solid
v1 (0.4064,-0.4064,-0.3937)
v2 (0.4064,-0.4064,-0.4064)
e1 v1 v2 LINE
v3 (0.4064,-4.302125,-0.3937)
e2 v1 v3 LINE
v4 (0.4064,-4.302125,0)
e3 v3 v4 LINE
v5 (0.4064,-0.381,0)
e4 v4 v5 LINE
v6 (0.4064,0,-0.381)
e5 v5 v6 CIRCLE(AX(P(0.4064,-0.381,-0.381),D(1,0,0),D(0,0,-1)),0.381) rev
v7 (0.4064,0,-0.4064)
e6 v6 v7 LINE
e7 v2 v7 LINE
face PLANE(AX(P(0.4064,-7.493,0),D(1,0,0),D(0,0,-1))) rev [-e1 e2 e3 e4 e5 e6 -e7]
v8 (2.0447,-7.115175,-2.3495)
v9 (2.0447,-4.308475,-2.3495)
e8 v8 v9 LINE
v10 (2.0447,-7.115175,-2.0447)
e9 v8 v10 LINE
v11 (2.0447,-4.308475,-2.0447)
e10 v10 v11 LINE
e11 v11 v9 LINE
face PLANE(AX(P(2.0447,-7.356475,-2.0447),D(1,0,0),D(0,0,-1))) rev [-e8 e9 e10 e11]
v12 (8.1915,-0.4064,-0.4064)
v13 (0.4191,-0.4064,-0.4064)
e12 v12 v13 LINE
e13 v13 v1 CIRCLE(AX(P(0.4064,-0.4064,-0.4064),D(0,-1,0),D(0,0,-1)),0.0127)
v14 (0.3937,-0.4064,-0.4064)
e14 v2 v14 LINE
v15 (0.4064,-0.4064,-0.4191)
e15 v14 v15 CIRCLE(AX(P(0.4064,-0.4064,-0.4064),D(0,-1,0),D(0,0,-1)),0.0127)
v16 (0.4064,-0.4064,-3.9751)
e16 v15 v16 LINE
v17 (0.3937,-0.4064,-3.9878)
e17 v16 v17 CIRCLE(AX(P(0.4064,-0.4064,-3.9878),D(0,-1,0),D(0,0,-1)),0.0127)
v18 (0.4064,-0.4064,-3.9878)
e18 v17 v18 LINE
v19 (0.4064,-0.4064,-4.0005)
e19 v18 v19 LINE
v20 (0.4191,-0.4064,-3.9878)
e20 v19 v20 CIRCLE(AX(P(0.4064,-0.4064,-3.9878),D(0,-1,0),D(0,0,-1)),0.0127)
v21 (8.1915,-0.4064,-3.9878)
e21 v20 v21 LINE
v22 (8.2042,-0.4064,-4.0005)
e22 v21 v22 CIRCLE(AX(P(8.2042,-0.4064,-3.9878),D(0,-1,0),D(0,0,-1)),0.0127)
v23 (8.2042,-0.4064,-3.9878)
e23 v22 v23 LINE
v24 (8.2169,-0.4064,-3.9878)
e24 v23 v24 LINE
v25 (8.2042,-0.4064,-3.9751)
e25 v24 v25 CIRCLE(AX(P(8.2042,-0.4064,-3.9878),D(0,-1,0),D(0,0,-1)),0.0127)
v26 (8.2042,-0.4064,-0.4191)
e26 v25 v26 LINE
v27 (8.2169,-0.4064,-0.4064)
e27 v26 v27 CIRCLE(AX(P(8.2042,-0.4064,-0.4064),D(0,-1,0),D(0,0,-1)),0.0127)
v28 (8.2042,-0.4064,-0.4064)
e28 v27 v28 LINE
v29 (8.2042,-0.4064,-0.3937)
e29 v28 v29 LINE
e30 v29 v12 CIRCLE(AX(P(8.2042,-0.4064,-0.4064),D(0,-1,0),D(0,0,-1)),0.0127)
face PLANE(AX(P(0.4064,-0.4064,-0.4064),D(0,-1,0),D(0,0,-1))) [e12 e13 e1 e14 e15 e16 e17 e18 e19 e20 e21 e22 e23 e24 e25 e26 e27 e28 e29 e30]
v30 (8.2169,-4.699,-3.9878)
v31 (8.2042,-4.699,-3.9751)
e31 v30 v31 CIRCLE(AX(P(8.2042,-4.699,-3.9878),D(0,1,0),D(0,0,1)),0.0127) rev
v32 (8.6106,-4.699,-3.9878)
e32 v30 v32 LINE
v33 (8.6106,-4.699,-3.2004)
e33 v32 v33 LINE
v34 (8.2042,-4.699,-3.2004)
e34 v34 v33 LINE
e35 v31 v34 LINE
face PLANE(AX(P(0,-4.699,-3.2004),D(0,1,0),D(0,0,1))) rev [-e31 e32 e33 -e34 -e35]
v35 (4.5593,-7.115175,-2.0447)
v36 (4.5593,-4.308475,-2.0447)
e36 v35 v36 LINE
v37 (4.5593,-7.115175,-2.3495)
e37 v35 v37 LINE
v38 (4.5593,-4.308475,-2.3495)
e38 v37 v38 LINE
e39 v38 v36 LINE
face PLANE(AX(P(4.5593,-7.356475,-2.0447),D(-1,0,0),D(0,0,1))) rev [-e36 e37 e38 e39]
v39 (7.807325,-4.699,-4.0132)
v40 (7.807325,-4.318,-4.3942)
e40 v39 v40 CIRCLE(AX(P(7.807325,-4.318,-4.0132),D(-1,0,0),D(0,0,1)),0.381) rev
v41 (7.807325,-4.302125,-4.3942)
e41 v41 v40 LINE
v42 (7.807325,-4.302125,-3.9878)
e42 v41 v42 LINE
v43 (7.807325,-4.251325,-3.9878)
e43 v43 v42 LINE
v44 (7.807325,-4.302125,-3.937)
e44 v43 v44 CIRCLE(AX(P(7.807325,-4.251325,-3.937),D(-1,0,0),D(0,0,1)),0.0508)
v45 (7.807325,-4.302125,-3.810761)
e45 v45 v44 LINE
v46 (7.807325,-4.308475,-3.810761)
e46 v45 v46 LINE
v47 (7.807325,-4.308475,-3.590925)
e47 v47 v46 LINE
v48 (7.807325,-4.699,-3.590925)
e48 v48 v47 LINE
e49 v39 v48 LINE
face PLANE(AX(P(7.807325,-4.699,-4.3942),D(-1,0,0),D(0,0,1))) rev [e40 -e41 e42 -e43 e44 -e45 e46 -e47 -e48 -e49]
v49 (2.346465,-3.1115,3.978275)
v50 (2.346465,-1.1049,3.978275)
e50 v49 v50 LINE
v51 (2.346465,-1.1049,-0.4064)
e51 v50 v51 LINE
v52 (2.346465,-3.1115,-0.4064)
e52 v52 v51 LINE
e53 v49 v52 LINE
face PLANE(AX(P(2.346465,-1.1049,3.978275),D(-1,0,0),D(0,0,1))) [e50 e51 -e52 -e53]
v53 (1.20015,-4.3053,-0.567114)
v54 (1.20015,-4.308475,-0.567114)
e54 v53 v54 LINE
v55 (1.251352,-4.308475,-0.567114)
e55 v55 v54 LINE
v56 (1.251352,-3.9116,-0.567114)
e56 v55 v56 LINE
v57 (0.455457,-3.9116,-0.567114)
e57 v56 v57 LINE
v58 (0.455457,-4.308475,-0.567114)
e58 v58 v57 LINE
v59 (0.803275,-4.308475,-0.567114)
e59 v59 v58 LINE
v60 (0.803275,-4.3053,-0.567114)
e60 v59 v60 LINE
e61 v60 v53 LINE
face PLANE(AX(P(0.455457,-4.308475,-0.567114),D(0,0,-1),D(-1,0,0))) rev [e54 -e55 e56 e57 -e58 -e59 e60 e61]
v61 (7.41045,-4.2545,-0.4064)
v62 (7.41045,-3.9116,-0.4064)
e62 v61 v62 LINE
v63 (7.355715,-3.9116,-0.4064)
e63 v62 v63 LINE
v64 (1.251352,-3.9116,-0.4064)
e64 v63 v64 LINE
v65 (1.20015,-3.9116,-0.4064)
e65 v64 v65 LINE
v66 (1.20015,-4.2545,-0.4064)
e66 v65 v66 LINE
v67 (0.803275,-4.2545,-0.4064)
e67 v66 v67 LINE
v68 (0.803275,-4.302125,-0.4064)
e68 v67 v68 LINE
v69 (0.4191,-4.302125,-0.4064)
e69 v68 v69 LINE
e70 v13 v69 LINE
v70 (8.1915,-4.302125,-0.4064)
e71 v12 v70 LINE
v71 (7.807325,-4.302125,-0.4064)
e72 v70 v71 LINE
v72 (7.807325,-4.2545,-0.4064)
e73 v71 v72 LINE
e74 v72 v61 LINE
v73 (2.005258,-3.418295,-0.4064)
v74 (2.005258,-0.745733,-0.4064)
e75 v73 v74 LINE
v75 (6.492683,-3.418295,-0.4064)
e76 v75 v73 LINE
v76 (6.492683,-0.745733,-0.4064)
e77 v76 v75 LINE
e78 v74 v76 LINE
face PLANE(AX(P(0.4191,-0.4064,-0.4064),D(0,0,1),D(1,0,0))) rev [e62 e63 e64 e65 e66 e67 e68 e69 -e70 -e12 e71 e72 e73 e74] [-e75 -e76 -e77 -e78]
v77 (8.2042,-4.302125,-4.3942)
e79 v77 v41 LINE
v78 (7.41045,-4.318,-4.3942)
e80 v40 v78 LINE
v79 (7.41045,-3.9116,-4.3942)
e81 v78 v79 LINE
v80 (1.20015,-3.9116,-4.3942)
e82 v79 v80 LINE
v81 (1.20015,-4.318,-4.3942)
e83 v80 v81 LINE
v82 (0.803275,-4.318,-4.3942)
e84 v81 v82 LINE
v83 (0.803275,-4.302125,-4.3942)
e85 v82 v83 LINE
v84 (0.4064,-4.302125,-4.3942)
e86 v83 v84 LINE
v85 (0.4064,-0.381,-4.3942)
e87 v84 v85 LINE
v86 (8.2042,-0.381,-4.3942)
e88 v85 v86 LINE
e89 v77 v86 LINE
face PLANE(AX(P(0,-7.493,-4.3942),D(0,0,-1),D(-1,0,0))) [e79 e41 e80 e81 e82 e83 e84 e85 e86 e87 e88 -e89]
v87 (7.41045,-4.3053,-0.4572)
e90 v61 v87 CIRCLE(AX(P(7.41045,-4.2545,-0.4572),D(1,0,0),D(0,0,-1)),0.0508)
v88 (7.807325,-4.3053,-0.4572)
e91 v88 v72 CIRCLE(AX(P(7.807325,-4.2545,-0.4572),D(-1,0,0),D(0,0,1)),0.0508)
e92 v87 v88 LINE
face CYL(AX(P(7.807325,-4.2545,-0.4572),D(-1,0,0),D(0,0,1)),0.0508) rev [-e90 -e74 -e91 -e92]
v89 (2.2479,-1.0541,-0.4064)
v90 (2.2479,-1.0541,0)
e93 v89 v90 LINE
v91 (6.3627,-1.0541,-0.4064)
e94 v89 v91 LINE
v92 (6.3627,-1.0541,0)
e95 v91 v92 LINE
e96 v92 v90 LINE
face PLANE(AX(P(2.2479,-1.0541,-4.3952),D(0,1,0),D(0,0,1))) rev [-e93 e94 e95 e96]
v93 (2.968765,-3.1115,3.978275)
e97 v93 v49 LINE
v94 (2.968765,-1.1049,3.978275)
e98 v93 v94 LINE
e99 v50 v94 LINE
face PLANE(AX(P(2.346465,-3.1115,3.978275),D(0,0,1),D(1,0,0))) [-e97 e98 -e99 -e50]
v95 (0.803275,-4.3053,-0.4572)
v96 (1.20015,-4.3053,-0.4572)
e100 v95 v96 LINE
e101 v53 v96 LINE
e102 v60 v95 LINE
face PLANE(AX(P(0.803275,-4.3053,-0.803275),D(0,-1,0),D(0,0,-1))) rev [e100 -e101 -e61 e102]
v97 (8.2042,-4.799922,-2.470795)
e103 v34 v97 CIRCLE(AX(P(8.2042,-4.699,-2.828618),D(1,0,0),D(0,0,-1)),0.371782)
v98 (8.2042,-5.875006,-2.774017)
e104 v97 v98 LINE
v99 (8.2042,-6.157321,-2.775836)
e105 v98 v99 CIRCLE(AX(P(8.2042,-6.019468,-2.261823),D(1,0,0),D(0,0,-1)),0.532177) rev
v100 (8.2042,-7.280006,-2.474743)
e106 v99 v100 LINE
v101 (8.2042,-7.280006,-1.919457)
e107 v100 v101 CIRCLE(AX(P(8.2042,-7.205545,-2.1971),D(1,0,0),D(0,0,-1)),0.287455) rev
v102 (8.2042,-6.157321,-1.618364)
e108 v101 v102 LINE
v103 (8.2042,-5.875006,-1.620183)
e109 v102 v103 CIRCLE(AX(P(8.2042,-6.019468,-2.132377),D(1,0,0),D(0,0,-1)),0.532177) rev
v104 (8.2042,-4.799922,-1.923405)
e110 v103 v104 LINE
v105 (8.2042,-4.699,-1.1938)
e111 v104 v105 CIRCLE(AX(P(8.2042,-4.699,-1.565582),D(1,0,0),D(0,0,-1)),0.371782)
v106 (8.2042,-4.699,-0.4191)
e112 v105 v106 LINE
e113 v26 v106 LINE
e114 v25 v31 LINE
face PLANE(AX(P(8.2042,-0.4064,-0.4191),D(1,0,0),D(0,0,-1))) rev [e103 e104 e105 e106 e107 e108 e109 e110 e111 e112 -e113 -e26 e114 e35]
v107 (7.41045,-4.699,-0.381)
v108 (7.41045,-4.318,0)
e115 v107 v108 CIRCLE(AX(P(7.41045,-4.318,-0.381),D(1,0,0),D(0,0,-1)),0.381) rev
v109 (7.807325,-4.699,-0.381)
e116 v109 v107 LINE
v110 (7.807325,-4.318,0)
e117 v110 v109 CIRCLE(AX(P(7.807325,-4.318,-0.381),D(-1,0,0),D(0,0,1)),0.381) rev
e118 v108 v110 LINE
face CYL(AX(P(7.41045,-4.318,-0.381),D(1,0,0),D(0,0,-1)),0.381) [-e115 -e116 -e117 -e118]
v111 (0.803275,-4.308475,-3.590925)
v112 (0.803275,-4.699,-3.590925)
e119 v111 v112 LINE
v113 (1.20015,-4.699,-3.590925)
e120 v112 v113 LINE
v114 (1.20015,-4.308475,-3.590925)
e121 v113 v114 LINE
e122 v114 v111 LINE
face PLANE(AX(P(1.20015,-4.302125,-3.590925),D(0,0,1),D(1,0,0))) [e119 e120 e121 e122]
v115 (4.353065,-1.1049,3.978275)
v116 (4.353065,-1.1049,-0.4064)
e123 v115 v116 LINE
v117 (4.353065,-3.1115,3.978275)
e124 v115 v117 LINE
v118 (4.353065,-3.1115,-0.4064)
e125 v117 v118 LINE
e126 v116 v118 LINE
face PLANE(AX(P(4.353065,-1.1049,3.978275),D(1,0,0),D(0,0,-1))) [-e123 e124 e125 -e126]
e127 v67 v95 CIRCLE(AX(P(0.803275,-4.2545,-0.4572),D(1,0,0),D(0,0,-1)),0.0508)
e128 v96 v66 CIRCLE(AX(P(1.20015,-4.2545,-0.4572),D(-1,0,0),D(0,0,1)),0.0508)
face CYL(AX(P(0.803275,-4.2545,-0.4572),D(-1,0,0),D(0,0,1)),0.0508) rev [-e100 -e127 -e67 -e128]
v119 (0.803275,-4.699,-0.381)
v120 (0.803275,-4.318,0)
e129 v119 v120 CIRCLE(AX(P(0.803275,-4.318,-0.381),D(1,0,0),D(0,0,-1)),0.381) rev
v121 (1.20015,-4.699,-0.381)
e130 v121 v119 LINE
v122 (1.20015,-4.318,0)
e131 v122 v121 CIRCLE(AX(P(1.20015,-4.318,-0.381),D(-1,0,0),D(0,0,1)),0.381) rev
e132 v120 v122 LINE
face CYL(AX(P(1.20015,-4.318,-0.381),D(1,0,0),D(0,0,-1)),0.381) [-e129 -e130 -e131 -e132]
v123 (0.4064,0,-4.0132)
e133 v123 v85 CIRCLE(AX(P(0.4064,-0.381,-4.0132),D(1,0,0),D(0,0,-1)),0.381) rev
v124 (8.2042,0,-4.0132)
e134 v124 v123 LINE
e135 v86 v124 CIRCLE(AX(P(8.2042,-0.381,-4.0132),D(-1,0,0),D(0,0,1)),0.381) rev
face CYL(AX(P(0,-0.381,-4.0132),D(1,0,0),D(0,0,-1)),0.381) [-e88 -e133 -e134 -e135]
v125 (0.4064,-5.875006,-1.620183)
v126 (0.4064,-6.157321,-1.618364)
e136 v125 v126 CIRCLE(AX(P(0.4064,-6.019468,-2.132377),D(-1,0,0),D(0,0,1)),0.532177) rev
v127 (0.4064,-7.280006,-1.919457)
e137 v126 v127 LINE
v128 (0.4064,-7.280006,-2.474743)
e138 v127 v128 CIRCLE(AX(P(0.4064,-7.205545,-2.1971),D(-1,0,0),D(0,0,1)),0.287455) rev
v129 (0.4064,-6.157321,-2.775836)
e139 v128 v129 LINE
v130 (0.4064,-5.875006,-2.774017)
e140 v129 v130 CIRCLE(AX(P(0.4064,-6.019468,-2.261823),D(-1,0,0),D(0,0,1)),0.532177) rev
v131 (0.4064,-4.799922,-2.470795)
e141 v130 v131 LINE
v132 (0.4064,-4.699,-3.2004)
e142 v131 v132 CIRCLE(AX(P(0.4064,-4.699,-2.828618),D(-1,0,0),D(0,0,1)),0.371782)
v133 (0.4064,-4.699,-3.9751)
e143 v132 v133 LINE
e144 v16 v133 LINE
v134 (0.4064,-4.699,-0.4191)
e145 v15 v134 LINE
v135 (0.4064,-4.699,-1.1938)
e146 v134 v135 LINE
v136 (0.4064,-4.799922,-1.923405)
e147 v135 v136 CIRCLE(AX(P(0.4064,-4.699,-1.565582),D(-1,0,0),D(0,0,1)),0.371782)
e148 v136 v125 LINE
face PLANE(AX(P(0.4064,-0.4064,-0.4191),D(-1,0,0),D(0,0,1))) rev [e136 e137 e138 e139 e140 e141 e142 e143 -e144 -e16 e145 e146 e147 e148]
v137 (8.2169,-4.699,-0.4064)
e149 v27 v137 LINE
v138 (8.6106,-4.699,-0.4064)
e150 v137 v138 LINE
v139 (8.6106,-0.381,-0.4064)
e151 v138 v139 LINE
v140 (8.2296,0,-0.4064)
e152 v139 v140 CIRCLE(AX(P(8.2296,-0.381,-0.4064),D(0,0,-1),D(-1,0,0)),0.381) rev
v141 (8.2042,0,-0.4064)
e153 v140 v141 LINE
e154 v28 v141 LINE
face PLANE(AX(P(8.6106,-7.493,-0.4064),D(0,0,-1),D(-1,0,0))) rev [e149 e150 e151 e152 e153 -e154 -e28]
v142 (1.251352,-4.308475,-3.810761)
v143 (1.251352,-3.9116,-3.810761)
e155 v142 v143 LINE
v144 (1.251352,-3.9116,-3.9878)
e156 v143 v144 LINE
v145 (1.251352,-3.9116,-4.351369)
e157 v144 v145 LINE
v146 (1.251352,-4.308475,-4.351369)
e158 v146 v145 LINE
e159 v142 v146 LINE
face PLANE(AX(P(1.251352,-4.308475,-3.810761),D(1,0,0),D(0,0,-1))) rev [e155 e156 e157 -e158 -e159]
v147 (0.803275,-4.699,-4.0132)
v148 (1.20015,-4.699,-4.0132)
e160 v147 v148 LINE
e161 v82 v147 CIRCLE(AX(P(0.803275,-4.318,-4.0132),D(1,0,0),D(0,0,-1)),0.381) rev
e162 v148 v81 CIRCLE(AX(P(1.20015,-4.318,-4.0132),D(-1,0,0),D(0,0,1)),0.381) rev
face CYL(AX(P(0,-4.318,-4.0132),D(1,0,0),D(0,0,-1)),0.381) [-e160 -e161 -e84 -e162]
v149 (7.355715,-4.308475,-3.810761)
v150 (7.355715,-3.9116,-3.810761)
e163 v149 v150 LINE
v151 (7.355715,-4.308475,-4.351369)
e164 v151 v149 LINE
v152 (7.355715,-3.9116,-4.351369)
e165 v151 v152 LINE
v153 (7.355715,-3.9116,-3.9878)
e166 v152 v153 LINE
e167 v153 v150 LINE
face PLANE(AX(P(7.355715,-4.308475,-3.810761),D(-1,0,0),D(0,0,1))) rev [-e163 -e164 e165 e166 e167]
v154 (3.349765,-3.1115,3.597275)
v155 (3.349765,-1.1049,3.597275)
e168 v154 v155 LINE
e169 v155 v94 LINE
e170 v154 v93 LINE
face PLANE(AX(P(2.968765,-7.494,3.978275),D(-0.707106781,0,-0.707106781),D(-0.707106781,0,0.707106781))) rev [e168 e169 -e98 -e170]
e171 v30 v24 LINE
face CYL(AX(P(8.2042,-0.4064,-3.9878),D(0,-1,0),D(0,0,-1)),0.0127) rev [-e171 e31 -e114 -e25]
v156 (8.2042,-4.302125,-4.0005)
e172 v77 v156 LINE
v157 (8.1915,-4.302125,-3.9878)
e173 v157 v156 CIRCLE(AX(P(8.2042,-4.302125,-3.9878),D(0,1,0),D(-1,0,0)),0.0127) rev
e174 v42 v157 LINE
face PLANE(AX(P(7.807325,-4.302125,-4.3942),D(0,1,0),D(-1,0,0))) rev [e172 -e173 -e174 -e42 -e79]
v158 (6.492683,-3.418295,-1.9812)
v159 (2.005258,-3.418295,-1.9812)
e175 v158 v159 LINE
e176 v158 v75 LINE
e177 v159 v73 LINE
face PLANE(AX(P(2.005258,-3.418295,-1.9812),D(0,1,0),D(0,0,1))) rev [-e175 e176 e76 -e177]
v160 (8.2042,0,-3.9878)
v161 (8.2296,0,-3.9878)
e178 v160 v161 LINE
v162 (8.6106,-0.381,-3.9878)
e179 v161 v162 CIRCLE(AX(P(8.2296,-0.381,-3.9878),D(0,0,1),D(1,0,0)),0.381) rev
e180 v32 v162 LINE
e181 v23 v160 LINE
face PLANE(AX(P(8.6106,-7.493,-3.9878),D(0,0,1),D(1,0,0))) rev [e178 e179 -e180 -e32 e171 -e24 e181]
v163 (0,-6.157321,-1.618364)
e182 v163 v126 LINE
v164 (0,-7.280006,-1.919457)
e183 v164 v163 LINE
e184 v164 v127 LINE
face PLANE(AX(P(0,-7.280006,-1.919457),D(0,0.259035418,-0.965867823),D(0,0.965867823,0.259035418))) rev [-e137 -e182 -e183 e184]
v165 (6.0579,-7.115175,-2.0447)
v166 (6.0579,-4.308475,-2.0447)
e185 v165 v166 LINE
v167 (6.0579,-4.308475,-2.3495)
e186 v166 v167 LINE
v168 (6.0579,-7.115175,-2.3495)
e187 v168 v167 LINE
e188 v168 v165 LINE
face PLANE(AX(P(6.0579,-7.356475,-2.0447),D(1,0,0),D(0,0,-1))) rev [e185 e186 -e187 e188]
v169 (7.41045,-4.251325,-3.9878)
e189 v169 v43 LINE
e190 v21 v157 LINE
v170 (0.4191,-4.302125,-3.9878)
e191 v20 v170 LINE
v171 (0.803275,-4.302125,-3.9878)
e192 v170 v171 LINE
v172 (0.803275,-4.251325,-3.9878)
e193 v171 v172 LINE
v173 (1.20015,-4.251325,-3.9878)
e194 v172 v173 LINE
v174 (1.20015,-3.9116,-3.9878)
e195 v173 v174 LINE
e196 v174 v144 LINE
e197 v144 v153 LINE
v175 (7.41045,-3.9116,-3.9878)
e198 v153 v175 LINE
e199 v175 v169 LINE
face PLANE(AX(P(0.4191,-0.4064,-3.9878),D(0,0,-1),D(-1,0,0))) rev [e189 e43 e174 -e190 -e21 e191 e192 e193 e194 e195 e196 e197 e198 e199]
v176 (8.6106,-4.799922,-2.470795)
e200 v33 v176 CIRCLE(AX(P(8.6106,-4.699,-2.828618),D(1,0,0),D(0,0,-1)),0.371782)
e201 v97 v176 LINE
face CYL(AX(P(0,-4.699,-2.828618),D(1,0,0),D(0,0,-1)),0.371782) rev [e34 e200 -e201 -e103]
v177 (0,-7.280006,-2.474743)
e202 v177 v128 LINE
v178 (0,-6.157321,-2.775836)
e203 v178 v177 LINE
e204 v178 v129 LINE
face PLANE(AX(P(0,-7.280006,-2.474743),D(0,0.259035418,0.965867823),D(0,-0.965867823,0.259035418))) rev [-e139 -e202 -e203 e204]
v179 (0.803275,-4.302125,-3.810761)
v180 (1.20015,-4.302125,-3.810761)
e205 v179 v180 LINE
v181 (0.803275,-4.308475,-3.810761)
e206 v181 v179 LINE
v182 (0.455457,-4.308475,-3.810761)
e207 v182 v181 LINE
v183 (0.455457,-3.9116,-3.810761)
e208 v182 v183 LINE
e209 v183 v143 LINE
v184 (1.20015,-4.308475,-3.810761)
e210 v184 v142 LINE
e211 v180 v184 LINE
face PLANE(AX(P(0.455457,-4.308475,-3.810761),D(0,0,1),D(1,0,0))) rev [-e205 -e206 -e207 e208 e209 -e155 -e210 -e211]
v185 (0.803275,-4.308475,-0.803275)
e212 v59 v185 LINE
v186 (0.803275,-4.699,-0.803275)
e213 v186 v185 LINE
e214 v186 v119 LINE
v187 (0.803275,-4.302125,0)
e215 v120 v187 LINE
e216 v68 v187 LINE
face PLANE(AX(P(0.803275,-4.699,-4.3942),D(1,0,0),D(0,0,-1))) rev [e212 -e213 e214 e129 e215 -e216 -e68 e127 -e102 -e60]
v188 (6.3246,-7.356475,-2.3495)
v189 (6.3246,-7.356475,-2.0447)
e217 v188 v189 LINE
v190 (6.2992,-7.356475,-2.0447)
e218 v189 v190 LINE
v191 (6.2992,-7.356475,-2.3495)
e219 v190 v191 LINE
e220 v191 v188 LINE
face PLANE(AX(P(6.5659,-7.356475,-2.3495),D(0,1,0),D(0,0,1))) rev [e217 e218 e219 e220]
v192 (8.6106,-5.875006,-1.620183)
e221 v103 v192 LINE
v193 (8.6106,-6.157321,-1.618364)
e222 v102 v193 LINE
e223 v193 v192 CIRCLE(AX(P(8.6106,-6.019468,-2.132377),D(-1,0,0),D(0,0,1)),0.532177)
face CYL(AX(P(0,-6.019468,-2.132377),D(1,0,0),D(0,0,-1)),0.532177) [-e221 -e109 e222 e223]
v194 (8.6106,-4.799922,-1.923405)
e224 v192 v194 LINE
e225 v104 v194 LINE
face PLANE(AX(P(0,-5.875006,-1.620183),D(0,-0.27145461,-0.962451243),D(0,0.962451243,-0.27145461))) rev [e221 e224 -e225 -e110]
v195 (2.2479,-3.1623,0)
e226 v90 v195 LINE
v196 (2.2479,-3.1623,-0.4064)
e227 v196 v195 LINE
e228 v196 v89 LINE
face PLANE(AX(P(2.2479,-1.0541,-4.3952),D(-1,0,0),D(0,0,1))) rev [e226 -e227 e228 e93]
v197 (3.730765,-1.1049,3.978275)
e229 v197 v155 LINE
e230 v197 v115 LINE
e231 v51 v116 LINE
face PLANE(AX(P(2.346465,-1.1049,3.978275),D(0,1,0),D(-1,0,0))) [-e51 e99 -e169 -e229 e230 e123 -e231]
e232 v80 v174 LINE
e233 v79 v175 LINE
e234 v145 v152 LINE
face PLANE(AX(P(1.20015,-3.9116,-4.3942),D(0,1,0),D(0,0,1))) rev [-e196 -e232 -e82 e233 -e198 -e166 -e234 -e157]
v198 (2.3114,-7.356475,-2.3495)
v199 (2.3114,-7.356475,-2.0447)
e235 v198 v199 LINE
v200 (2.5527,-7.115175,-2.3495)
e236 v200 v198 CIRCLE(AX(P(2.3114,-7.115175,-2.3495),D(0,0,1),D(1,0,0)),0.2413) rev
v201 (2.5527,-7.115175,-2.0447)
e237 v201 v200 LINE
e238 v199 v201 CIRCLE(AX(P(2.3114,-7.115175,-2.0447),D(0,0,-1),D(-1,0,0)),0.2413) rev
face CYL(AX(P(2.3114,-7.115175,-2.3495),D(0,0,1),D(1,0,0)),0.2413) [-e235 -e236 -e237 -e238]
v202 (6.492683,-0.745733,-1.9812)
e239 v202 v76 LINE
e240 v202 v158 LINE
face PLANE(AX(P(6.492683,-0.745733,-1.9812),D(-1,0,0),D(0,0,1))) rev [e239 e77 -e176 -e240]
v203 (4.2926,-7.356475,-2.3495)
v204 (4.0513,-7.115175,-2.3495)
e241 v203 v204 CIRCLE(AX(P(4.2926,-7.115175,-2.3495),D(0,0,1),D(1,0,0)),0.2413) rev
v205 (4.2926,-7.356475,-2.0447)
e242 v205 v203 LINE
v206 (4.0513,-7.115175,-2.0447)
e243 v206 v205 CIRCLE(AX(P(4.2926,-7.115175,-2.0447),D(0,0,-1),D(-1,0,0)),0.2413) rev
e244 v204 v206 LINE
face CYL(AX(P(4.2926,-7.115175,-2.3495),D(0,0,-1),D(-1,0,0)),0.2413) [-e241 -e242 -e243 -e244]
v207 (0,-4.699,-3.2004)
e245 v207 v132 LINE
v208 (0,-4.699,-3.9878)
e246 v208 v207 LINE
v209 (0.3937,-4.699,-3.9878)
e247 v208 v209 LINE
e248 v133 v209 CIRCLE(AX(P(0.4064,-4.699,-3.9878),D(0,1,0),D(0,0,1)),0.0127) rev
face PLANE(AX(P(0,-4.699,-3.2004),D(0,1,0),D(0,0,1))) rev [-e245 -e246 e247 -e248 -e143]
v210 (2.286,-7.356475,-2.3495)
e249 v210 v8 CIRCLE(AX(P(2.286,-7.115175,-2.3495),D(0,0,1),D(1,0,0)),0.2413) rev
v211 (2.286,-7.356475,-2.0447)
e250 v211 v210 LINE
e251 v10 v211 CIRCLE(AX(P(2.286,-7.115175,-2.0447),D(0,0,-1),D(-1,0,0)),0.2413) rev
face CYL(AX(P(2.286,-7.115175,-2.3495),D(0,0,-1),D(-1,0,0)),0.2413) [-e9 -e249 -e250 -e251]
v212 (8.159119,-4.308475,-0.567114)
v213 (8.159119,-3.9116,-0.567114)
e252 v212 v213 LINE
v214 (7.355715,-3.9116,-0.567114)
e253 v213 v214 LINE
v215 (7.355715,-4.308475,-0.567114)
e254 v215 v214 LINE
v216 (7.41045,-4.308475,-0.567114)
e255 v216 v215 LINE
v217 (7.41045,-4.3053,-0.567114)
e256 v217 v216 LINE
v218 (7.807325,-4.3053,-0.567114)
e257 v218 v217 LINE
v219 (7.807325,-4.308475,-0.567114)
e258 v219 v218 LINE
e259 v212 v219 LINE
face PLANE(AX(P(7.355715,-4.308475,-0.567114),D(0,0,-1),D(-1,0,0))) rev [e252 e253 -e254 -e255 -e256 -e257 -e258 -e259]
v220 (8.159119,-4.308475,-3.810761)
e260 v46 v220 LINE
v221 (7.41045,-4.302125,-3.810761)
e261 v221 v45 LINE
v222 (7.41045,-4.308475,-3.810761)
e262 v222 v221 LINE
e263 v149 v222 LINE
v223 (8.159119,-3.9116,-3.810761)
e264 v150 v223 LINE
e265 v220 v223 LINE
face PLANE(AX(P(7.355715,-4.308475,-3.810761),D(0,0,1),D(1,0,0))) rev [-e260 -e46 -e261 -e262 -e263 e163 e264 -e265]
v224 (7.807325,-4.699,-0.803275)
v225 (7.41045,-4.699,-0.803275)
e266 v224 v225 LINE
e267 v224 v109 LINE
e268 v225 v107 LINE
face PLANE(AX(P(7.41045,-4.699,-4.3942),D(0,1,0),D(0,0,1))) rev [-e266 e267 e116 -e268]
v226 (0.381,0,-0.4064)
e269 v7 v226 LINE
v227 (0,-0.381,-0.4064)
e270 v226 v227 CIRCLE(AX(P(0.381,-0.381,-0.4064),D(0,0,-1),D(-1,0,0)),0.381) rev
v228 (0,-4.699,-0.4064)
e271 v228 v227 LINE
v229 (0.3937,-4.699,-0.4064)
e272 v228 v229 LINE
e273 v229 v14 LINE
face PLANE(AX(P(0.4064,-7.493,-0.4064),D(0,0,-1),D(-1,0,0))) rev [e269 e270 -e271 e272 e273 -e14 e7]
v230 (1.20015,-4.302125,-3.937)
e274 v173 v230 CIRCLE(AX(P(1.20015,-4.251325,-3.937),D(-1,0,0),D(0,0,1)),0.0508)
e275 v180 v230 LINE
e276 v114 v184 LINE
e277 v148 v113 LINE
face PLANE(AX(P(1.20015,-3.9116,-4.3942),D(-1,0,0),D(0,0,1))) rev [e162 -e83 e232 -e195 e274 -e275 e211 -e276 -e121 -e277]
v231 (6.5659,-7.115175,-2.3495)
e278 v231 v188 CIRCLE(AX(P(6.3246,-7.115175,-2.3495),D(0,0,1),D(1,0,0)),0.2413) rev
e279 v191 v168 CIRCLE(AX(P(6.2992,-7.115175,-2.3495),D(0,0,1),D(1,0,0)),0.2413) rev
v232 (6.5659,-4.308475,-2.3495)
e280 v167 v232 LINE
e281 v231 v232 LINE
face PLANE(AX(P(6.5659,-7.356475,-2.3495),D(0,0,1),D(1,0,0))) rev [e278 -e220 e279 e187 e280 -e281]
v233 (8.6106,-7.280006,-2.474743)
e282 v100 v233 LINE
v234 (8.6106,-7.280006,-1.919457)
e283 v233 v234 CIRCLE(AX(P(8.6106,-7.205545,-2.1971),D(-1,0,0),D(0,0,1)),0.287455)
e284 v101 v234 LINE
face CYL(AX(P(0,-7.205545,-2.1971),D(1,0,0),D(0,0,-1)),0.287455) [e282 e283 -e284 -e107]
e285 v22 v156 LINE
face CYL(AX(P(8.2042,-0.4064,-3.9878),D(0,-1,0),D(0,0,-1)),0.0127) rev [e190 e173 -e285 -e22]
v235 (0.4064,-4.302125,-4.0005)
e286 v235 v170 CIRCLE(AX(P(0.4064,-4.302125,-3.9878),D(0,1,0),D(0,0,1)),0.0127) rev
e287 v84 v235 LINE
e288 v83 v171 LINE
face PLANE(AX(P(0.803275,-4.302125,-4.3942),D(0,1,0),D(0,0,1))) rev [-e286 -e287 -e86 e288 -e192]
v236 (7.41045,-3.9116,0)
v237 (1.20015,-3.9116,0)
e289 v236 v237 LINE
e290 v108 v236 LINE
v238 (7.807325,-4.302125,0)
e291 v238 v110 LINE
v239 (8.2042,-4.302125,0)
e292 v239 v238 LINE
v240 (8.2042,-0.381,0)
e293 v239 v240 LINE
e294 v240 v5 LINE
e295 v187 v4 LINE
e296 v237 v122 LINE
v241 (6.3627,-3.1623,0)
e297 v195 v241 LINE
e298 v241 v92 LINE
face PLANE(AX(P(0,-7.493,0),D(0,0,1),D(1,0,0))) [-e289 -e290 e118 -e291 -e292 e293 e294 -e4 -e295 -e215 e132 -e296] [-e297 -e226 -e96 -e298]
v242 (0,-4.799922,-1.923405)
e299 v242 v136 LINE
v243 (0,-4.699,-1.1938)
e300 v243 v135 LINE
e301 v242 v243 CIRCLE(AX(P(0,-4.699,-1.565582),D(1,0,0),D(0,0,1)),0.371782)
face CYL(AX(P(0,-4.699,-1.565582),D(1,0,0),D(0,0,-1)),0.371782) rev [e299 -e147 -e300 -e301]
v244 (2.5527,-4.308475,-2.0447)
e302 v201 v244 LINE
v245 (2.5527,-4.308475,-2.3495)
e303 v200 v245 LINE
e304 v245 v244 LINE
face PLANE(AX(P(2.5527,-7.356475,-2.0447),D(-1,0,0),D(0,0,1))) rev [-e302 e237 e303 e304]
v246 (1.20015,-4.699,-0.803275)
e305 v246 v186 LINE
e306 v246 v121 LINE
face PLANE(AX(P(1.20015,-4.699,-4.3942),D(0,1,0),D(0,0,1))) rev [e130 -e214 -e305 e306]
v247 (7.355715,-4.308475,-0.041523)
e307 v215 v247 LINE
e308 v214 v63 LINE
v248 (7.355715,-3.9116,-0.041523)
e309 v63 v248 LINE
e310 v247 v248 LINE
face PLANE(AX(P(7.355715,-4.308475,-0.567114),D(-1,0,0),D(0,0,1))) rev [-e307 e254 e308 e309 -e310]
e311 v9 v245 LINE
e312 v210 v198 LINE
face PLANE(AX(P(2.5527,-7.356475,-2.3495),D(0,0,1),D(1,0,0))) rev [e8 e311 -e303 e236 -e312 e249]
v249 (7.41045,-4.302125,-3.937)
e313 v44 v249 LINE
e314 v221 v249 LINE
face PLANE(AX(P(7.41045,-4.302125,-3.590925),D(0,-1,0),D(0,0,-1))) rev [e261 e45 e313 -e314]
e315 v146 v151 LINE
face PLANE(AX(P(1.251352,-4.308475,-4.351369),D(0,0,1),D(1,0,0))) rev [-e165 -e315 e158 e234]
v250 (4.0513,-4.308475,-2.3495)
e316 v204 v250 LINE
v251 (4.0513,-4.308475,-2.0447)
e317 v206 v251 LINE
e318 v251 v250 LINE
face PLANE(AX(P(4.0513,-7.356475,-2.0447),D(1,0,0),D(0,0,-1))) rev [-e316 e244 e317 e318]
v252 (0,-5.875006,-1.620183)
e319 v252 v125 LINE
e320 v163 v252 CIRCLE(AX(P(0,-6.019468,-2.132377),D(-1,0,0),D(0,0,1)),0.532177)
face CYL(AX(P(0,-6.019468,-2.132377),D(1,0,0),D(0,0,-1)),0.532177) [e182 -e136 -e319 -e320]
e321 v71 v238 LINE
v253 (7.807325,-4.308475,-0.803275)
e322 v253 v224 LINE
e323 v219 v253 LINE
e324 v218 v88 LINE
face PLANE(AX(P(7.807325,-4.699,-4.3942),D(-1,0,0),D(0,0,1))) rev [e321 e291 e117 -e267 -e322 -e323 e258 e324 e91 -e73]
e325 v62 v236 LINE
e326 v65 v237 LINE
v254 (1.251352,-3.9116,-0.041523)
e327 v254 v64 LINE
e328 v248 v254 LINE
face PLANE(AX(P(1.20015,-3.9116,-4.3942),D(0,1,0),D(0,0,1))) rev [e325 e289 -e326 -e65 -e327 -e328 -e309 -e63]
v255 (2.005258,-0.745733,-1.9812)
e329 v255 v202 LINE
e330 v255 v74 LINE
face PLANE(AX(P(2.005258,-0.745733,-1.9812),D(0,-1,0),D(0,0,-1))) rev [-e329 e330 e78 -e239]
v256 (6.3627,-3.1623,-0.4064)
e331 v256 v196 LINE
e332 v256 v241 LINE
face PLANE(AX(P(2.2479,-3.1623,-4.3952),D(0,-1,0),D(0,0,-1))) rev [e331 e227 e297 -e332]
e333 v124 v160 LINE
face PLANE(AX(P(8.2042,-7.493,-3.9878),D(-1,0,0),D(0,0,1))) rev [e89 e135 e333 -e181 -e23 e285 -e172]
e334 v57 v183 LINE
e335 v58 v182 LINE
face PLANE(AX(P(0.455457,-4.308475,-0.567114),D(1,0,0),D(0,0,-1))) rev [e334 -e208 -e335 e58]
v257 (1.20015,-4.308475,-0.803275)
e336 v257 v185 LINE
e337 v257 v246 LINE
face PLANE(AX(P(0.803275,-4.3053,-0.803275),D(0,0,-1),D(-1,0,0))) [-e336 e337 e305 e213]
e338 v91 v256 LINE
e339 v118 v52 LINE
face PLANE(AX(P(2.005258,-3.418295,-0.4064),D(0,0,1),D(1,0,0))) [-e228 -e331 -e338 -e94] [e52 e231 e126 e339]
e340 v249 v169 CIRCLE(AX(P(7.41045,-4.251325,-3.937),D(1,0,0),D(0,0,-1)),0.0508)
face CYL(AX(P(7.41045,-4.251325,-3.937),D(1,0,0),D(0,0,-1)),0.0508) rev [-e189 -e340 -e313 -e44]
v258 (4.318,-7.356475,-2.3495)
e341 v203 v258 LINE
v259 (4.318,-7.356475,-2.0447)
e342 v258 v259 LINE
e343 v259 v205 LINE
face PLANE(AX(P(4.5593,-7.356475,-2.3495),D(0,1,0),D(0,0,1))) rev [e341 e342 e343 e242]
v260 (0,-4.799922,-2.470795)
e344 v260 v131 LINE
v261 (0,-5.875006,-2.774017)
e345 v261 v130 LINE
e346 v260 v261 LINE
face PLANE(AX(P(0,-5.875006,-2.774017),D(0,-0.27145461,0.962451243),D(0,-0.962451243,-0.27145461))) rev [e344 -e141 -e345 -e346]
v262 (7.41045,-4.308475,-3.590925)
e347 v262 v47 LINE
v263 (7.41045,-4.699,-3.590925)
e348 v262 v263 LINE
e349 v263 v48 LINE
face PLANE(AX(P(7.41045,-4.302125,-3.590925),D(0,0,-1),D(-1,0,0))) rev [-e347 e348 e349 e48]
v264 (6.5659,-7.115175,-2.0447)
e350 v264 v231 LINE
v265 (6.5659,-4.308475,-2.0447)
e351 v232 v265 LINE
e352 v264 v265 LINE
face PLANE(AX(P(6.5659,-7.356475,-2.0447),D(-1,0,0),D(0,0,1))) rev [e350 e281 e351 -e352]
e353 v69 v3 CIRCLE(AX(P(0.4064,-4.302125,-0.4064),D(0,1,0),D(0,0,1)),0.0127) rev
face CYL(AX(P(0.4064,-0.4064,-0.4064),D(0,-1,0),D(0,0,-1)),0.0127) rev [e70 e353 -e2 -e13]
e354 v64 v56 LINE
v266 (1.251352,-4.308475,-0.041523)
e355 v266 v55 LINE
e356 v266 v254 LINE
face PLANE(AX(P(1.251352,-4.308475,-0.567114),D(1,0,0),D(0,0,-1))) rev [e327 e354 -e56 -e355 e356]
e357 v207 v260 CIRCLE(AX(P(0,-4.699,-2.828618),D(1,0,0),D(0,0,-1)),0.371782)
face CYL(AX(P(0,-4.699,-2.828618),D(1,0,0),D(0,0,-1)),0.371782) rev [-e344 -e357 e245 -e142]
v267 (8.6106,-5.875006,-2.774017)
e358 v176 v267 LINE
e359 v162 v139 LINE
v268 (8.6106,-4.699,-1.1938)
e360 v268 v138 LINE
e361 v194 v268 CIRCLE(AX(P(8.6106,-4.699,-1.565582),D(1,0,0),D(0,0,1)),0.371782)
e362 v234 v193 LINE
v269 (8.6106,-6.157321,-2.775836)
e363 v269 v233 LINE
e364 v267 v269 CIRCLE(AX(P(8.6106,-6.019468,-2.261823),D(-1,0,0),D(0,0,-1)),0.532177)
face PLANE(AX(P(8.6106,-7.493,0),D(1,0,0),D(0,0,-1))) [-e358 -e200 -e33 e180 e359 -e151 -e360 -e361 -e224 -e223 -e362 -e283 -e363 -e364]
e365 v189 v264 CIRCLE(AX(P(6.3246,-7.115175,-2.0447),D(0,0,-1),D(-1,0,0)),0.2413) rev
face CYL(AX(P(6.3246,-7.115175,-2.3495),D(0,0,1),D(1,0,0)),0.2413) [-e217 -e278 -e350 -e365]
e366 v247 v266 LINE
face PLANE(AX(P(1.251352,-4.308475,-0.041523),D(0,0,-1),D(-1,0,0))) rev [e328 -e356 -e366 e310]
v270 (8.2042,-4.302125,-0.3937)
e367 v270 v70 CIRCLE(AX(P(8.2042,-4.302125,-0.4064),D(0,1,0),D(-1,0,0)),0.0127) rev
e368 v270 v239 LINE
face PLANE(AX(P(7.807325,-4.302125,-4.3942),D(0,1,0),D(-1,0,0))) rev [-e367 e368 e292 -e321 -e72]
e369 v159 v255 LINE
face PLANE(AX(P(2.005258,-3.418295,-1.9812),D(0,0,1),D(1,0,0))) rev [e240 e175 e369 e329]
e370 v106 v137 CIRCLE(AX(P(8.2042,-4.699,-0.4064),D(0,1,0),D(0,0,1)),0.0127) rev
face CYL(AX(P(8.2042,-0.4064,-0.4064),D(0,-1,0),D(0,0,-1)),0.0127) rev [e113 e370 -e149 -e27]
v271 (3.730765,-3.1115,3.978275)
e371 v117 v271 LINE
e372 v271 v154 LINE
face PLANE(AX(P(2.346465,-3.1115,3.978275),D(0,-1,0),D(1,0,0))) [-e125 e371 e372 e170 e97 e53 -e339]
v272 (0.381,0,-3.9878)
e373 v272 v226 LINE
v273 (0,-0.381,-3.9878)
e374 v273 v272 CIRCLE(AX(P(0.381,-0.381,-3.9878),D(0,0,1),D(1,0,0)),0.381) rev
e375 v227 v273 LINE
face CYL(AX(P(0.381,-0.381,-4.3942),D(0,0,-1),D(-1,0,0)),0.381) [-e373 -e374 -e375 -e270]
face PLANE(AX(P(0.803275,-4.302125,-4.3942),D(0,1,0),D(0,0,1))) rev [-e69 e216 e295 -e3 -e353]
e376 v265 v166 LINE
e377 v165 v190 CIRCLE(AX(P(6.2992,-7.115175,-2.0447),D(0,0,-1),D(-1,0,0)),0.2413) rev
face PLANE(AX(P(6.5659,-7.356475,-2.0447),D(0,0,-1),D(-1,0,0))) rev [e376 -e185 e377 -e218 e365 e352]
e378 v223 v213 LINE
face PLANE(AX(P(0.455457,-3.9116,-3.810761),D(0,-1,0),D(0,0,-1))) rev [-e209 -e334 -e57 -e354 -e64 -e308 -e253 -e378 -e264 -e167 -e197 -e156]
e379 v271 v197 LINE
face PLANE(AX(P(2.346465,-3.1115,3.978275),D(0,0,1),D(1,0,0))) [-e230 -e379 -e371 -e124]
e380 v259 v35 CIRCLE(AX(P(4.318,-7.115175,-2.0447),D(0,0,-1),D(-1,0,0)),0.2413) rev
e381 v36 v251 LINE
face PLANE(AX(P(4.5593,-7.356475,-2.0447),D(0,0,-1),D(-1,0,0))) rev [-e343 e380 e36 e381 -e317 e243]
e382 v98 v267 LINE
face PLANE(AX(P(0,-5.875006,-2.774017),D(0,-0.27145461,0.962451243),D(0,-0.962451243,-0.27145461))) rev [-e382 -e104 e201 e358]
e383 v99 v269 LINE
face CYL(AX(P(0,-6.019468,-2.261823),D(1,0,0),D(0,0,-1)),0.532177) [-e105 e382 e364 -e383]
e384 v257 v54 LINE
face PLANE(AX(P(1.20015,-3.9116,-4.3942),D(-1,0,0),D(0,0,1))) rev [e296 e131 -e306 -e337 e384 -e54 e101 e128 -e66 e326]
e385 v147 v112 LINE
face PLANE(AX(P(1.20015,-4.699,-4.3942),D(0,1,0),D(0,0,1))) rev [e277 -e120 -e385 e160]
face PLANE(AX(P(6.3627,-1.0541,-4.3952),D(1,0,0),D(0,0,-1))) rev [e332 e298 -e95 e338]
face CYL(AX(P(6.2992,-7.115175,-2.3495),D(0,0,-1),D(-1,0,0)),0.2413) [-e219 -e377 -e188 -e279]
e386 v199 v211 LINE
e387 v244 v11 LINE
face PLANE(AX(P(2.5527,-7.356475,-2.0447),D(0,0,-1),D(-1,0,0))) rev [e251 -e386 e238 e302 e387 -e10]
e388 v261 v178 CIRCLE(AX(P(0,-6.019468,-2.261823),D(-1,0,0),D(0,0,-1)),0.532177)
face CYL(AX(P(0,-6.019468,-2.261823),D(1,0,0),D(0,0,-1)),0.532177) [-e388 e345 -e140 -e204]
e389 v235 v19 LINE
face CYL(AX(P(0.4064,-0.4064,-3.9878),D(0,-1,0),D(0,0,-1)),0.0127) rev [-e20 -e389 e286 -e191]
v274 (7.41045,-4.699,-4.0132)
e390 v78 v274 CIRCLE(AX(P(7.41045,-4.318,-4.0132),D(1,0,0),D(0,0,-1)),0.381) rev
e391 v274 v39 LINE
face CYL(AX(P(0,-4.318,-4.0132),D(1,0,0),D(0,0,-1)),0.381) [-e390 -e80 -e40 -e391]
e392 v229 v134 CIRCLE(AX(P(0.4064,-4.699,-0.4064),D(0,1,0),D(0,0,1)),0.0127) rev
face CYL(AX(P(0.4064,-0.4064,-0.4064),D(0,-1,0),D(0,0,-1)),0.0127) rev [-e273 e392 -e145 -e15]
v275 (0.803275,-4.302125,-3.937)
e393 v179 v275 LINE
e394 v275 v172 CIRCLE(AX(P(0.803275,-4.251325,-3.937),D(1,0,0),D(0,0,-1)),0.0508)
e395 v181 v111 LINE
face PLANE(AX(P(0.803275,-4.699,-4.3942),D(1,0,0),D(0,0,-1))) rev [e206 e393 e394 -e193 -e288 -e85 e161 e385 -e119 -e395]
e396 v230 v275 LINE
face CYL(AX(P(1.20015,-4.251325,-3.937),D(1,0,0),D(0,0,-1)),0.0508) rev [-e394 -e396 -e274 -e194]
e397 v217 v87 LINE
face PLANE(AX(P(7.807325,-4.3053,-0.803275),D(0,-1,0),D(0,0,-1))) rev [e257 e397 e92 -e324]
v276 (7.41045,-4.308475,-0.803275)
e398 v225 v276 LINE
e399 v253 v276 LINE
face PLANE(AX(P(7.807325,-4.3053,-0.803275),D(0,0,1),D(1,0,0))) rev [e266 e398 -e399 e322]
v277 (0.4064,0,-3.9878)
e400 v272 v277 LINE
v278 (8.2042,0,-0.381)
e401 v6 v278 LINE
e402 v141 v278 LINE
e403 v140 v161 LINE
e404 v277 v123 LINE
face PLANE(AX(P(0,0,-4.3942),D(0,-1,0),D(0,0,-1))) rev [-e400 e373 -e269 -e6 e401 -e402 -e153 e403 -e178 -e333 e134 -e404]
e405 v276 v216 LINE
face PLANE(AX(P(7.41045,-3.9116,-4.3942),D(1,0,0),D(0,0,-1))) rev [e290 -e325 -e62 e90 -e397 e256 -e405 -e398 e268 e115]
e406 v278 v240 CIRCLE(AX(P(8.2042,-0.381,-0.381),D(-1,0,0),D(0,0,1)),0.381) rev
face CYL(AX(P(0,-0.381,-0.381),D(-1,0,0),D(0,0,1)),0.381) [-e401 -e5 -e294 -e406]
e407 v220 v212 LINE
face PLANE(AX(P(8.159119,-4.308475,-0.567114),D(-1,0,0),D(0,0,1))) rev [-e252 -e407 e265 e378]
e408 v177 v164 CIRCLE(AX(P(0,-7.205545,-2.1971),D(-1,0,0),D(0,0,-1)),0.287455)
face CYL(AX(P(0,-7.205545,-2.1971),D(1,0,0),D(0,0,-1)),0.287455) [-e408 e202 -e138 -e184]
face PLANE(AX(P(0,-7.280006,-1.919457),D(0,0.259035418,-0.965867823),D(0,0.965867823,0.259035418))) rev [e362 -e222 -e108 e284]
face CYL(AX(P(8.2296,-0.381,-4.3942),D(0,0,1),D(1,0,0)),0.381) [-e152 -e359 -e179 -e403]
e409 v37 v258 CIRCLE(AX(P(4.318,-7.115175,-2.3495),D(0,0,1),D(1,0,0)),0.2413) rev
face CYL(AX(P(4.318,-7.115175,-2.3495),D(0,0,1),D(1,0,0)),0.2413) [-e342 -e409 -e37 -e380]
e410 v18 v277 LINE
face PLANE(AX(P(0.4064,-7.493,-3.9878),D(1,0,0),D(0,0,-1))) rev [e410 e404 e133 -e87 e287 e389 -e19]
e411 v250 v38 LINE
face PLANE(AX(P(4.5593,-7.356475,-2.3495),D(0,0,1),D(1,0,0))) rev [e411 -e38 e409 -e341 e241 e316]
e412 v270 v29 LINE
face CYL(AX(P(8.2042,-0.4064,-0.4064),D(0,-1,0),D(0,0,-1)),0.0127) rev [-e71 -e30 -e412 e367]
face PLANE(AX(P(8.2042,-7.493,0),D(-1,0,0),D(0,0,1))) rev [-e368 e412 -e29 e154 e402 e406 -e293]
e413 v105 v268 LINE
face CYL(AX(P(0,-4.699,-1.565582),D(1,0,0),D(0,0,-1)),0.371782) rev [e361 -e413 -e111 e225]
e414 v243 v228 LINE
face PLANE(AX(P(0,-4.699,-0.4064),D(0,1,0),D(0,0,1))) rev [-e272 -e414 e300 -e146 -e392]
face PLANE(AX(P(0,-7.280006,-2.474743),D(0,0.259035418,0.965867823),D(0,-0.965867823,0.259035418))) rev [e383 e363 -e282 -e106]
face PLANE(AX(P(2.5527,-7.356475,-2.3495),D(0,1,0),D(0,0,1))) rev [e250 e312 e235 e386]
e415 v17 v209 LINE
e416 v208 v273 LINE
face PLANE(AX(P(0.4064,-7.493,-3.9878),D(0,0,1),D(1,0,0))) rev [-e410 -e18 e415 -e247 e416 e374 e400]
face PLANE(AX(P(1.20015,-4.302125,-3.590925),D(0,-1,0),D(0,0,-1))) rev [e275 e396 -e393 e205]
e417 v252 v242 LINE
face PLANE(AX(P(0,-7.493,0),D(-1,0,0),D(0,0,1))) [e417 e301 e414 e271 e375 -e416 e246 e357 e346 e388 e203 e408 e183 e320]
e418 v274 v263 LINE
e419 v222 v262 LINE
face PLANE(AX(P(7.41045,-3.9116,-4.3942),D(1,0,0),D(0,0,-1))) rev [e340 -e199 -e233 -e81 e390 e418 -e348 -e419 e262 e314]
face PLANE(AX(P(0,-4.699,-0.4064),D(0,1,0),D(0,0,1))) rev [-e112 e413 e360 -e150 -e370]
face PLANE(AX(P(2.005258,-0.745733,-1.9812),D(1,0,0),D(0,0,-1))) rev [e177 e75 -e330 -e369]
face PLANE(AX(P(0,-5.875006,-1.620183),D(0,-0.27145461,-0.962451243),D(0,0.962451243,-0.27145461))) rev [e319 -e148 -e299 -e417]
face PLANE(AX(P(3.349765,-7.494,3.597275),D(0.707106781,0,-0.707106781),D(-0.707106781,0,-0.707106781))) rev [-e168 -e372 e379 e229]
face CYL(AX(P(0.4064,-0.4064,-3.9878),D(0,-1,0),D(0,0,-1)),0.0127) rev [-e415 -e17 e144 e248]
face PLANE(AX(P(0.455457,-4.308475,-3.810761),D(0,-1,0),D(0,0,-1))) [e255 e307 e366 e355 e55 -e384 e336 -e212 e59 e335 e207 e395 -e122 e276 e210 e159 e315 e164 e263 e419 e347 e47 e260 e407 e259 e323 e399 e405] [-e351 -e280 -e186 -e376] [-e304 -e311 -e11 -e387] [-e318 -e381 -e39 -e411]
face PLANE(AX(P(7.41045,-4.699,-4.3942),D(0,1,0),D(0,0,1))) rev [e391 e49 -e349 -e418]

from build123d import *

# Parameters (mm, degrees)
SKETCH1_W           = 8.6106
SKETCH1_H           = 4.3942
BOSS_EXTRUDE1_DEPTH = 7.493
SKETCH2_W           = 0.4064
SKETCH2_H           = 0.4064
CUT_EXTRUDE1_DEPTH  = 13.230963781
CUT_EXTRUDE4_DEPTH  = 7.0866
FILLET8_R           = 0.381
CUT_EXTRUDE5_DEPTH  = 13.230963781
CUT_EXTRUDE6_DEPTH  = 13.230963781
BOSS_EXTRUDE2_DEPTH = 0.396875
SKETCH7_W           = 0.396875
SKETCH7_H           = 0.3937
BOSS_EXTRUDE3_DEPTH = 0.396875
SKETCH8_W           = 0.396875
SKETCH8_H           = 0.396875
BOSS_EXTRUDE4_DEPTH = 0.396875
FILLET9_R           = 0.381
FILLET10_R          = 0.0508
CUT_EXTRUDE7_REACH  = 14.231
SKETCH9_W           = 4.1148
SKETCH9_H           = 2.1082
SKETCH11_W          = 2.0066
SKETCH11_H          = 2.0066
BOSS_EXTRUDE5_DEPTH = 4.384675
SKETCH12_W          = 4.487424853
SKETCH12_H          = 2.672562517
BOSS_EXTRUDE6_DEPTH = 1.5748
CUT_EXTRUDE10_REACH = 13.587
SKETCH14_W          = 0.508
SKETCH14_H          = 0.3048
BOSS_EXTRUDE7_DEPTH = 3.048
FILLET11_R          = 0.2413


with BuildPart() as part:
    # Sketch1 → Boss-Extrude1 (new body)
    with BuildSketch(Plane(origin=(0, 0, 0), x_dir=(1, 0, 0), z_dir=(0, 1, 0))):
        with Locations((4.3053, 2.1971)):
            Rectangle(SKETCH1_W, SKETCH1_H)
    extrude(amount=-BOSS_EXTRUDE1_DEPTH)

    # Sketch2 → Cut-Extrude1 (cut, through all)
    with BuildSketch(Plane(origin=(0, 0, 0), x_dir=(1, 0, 0), z_dir=(0, 1, 0))):
        with Locations((8.4074, 4.191)):
            Rectangle(SKETCH2_W, SKETCH2_H)
        with Locations((0.2032, 4.191)):
            Rectangle(SKETCH2_W, SKETCH2_H)
        with Locations((8.4074, 0.2032)):
            Rectangle(SKETCH2_W, SKETCH2_H)
        with Locations((0.2032, 0.2032)):
            Rectangle(SKETCH2_W, SKETCH2_H)
    extrude(amount=-CUT_EXTRUDE1_DEPTH, mode=Mode.SUBTRACT)

    # Sketch3 → Cut-Extrude4 (cut)
    with BuildSketch(Plane.XZ.offset(7.493)):
        with BuildLine():
            Line((0.4191, -0.4064), (8.1915, -0.4064))
            ThreePointArc((8.1915, -0.4064), (8.213180256, -0.397419744), (8.2042, -0.4191))
            Line((8.2042, -0.4191), (8.2042, -3.9751))
            ThreePointArc((8.2042, -3.9751), (8.213180256, -3.996780256), (8.1915, -3.9878))
            Line((8.1915, -3.9878), (0.4191, -3.9878))
            ThreePointArc((0.4191, -3.9878), (0.397419744, -3.996780256), (0.4064, -3.9751))
            Line((0.4064, -3.9751), (0.4064, -0.4191))
            ThreePointArc((0.4064, -0.4191), (0.397419744, -0.397419744), (0.4191, -0.4064))
        make_face()
    extrude(amount=-CUT_EXTRUDE4_DEPTH, mode=Mode.SUBTRACT)

    # Fillet8
    fillet8_edges = [part.edges().sort_by_distance(p)[0] for p in [
        (0, 0, -2.1971),
        (4.3053, 0, -4.3942),
        (8.6106, 0, -2.1971),
        (4.3053, 0, 0),
    ]]
    fillet(fillet8_edges, radius=FILLET8_R)

    # Sketch4 → Cut-Extrude5 (cut, through all)
    with BuildSketch(Plane.XY):
        Polygon((1.20015, -3.9116), (7.41045, -3.9116), (7.41045, -4.699), (7.807325, -4.699), (7.807325, -4.302125), (8.2042, -4.302125), (8.2042, -7.493), (0.4064, -7.493), (0.4064, -4.302125), (0.803275, -4.302125), (0.803275, -4.699), (1.20015, -4.699), align=None)
    extrude(amount=-CUT_EXTRUDE5_DEPTH, mode=Mode.SUBTRACT)

    # Sketch5 → Cut-Extrude6 (cut, through all)
    with BuildSketch(Plane(origin=(8.6106, 0, 0), x_dir=(0, 0, -1), z_dir=(1, 0, 0))):
        with BuildLine():
            Line((0.4064, -4.699), (1.1938, -4.699))
            ThreePointArc((1.1938, -4.699), (1.616523828, -4.330724179), (1.923404732, -4.799922032))
            Line((1.923404732, -4.799922032), (1.620182585, -5.875006123))
            ThreePointArc((1.620182585, -5.875006123), (1.600211037, -6.016040651), (1.61836436, -6.157320719))
            Line((1.61836436, -6.157320719), (1.91945657, -7.280006107))
            ThreePointArc((1.91945657, -7.280006107), (2.022134094, -7.433618006), (2.1971, -7.493))
            ThreePointArc((2.1971, -7.493), (2.372065906, -7.433618006), (2.47474343, -7.280006107))
            Line((2.47474343, -7.280006107), (2.77583564, -6.157320719))
            ThreePointArc((2.77583564, -6.157320719), (2.793988963, -6.016040651), (2.774017415, -5.875006123))
            Line((2.774017415, -5.875006123), (2.470795268, -4.799922032))
            ThreePointArc((2.470795268, -4.799922032), (2.777676172, -4.330724179), (3.2004, -4.699))
            Line((3.2004, -4.699), (3.9878, -4.699))
            Line((3.9878, -4.699), (3.9878, -7.640446321))
            Line((3.9878, -7.640446321), (0.4064, -7.640446321))
            Line((0.4064, -7.640446321), (0.4064, -4.699))
        make_face()
    extrude(amount=-CUT_EXTRUDE6_DEPTH, mode=Mode.SUBTRACT)



with BuildPart() as body_2:
    # Sketch6 → Boss-Extrude2 (new body)
    with BuildSketch(Plane.XZ.offset(3.9116)):
        Polygon((0.455456934, -0.567114284), (1.251351798, -0.567114284), (1.251351798, -0.041523335), (7.355715241, -0.041523335), (7.355715241, -0.567114284), (8.159118548, -0.567114284), (8.159118548, -3.810761279), (7.355715241, -3.810761279), (7.355715241, -4.351369112), (1.251351798, -4.351369112), (1.251351798, -3.810761279), (0.455456934, -3.810761279), align=None)
    extrude(amount=BOSS_EXTRUDE2_DEPTH)


with BuildPart() as part_1:
    add(part.part)

    add(body_2.part)  # Boss-Extrude3 merges body 2
    # Sketch7 → Boss-Extrude3 (add)
    with BuildSketch(Plane(origin=(0, 0, -0.4064), x_dir=(-1, 0, 0), z_dir=(0, 0, -1))):
        with Locations((-1.0017125, -4.50215)):
            Rectangle(SKETCH7_W, SKETCH7_H)
        with Locations((-7.6088875, -4.50215)):
            Rectangle(SKETCH7_W, SKETCH7_H)
    extrude(amount=BOSS_EXTRUDE3_DEPTH)

    # Sketch8 → Boss-Extrude4 (add)
    with BuildSketch(Plane.XY.offset(-3.9878)):
        with Locations((1.0017125, -4.5005625)):
            Rectangle(SKETCH8_W, SKETCH8_H)
        with Locations((7.6088875, -4.5005625)):
            Rectangle(SKETCH8_W, SKETCH8_H)
    extrude(amount=BOSS_EXTRUDE4_DEPTH)

    # Fillet9
    fillet9_edges = [part_1.edges().sort_by_distance(p)[0] for p in [
        (7.6088875, -4.699, -4.3942),
        (1.0017125, -4.699, -4.3942),
        (1.0017125, -4.699, 0),
        (7.6088875, -4.699, 0),
    ]]
    fillet(fillet9_edges, radius=FILLET9_R)

    # Fillet10
    # the kernel refuses this fillet: 0.0508 mm, written as the material it adds along each edge
    with BuildSketch(Plane(origin=(1.20015, -4.3053, -0.4064), x_dir=(0, 1, 0), z_dir=(-1, 0, 0)), Plane(origin=(0.803275, -4.302125, -3.9878), x_dir=(0, 1, 0), z_dir=(1, 0, 0))) as fillet10_piece_1:
        with BuildLine():
            CenterArc((FILLET10_R, FILLET10_R), FILLET10_R, 180, 90)
            Line((0, FILLET10_R), (0, 0))
            Line((0, 0), (FILLET10_R, 0))
        make_face()
    extrude(amount=0.396875)
    with BuildSketch(Plane(origin=(7.41045, -4.3053, -0.4064), x_dir=(0, 1, 0), z_dir=(1, 0, 0)), Plane(origin=(7.807325, -4.302125, -3.9878), x_dir=(0, 1, 0), z_dir=(-1, 0, 0))) as fillet10_piece_2:
        with BuildLine():
            CenterArc((FILLET10_R, -FILLET10_R), FILLET10_R, 90, 90)
            Line((0, -FILLET10_R), (0, 0))
            Line((0, 0), (FILLET10_R, 0))
        make_face()
    extrude(amount=0.396875)

    # Sketch9 → Cut-Extrude7 (cut, up to next)
    with BuildSketch(Plane.XY, mode=Mode.PRIVATE) as cut_extrude7_sk1:
        with Locations((4.3053, -2.1082)):
            Rectangle(SKETCH9_W, SKETCH9_H)
    cut_extrude7_tool1 = extrude(cut_extrude7_sk1.sketch, amount=-CUT_EXTRUDE7_REACH, mode=Mode.PRIVATE) & part_1.part
    add(cut_extrude7_tool1.solids().sort_by_distance((4.3053, -2.1082, 0))[0], mode=Mode.SUBTRACT)



with BuildPart() as body_2_2:
    # Sketch11 → Boss-Extrude5 (new body)
    with BuildSketch(Plane(origin=(0, 0, -0.4064), x_dir=(-1, 0, 0), z_dir=(0, 0, -1))):
        with Locations((-3.349764598, -2.1082)):
            Rectangle(SKETCH11_W, SKETCH11_H)
    extrude(amount=-BOSS_EXTRUDE5_DEPTH)


with BuildPart() as part_2:
    add(part_1.part)

    add(body_2_2.part)  # Boss-Extrude6 merges body 2 2
    # Sketch12 → Boss-Extrude6 (add)
    with BuildSketch(Plane(origin=(0, 0, -0.4064), x_dir=(-1, 0, 0), z_dir=(0, 0, -1))):
        with Locations((-4.248970079, -2.082014044)):
            Rectangle(SKETCH12_W, SKETCH12_H)
    extrude(amount=BOSS_EXTRUDE6_DEPTH)

    # Sketch13 → Cut-Extrude10 (cut, up to next)
    with BuildSketch(Plane(origin=(0, -1.1049, 0), x_dir=(1, 0, 0), z_dir=(0, 1, 0)), mode=Mode.PRIVATE) as cut_extrude10_sk1:
        Polygon((2.968764598, -3.978275), (3.349764598, -3.597275), (3.730764598, -3.978275), align=None)
    cut_extrude10_tool1 = extrude(cut_extrude10_sk1.sketch, amount=-CUT_EXTRUDE10_REACH, mode=Mode.PRIVATE) & part_2.part
    add(cut_extrude10_tool1.solids().sort_by_distance((3.349765, -1.1049, 3.851275))[0], mode=Mode.SUBTRACT)

    # Sketch14 → Boss-Extrude7 (add)
    with BuildSketch(Plane.XZ.offset(4.308475)):
        with Locations((6.3119, -2.1971)):
            Rectangle(SKETCH14_W, SKETCH14_H)
        with Locations((2.2987, -2.1971)):
            Rectangle(SKETCH14_W, SKETCH14_H)
        with Locations((4.3053, -2.1971)):
            Rectangle(SKETCH14_W, SKETCH14_H)
    extrude(amount=BOSS_EXTRUDE7_DEPTH)

    # Fillet11
    fillet11_edges = [part_2.edges().sort_by_distance(p)[0] for p in [
        (6.5659, -7.356475, -2.1971),
        (6.0579, -7.356475, -2.1971),
        (2.5527, -7.356475, -2.1971),
        (2.0447, -7.356475, -2.1971),
        (4.5593, -7.356475, -2.1971),
        (4.0513, -7.356475, -2.1971),
    ]]
    fillet(fillet11_edges, radius=FILLET11_R)


solid = part_2.part
